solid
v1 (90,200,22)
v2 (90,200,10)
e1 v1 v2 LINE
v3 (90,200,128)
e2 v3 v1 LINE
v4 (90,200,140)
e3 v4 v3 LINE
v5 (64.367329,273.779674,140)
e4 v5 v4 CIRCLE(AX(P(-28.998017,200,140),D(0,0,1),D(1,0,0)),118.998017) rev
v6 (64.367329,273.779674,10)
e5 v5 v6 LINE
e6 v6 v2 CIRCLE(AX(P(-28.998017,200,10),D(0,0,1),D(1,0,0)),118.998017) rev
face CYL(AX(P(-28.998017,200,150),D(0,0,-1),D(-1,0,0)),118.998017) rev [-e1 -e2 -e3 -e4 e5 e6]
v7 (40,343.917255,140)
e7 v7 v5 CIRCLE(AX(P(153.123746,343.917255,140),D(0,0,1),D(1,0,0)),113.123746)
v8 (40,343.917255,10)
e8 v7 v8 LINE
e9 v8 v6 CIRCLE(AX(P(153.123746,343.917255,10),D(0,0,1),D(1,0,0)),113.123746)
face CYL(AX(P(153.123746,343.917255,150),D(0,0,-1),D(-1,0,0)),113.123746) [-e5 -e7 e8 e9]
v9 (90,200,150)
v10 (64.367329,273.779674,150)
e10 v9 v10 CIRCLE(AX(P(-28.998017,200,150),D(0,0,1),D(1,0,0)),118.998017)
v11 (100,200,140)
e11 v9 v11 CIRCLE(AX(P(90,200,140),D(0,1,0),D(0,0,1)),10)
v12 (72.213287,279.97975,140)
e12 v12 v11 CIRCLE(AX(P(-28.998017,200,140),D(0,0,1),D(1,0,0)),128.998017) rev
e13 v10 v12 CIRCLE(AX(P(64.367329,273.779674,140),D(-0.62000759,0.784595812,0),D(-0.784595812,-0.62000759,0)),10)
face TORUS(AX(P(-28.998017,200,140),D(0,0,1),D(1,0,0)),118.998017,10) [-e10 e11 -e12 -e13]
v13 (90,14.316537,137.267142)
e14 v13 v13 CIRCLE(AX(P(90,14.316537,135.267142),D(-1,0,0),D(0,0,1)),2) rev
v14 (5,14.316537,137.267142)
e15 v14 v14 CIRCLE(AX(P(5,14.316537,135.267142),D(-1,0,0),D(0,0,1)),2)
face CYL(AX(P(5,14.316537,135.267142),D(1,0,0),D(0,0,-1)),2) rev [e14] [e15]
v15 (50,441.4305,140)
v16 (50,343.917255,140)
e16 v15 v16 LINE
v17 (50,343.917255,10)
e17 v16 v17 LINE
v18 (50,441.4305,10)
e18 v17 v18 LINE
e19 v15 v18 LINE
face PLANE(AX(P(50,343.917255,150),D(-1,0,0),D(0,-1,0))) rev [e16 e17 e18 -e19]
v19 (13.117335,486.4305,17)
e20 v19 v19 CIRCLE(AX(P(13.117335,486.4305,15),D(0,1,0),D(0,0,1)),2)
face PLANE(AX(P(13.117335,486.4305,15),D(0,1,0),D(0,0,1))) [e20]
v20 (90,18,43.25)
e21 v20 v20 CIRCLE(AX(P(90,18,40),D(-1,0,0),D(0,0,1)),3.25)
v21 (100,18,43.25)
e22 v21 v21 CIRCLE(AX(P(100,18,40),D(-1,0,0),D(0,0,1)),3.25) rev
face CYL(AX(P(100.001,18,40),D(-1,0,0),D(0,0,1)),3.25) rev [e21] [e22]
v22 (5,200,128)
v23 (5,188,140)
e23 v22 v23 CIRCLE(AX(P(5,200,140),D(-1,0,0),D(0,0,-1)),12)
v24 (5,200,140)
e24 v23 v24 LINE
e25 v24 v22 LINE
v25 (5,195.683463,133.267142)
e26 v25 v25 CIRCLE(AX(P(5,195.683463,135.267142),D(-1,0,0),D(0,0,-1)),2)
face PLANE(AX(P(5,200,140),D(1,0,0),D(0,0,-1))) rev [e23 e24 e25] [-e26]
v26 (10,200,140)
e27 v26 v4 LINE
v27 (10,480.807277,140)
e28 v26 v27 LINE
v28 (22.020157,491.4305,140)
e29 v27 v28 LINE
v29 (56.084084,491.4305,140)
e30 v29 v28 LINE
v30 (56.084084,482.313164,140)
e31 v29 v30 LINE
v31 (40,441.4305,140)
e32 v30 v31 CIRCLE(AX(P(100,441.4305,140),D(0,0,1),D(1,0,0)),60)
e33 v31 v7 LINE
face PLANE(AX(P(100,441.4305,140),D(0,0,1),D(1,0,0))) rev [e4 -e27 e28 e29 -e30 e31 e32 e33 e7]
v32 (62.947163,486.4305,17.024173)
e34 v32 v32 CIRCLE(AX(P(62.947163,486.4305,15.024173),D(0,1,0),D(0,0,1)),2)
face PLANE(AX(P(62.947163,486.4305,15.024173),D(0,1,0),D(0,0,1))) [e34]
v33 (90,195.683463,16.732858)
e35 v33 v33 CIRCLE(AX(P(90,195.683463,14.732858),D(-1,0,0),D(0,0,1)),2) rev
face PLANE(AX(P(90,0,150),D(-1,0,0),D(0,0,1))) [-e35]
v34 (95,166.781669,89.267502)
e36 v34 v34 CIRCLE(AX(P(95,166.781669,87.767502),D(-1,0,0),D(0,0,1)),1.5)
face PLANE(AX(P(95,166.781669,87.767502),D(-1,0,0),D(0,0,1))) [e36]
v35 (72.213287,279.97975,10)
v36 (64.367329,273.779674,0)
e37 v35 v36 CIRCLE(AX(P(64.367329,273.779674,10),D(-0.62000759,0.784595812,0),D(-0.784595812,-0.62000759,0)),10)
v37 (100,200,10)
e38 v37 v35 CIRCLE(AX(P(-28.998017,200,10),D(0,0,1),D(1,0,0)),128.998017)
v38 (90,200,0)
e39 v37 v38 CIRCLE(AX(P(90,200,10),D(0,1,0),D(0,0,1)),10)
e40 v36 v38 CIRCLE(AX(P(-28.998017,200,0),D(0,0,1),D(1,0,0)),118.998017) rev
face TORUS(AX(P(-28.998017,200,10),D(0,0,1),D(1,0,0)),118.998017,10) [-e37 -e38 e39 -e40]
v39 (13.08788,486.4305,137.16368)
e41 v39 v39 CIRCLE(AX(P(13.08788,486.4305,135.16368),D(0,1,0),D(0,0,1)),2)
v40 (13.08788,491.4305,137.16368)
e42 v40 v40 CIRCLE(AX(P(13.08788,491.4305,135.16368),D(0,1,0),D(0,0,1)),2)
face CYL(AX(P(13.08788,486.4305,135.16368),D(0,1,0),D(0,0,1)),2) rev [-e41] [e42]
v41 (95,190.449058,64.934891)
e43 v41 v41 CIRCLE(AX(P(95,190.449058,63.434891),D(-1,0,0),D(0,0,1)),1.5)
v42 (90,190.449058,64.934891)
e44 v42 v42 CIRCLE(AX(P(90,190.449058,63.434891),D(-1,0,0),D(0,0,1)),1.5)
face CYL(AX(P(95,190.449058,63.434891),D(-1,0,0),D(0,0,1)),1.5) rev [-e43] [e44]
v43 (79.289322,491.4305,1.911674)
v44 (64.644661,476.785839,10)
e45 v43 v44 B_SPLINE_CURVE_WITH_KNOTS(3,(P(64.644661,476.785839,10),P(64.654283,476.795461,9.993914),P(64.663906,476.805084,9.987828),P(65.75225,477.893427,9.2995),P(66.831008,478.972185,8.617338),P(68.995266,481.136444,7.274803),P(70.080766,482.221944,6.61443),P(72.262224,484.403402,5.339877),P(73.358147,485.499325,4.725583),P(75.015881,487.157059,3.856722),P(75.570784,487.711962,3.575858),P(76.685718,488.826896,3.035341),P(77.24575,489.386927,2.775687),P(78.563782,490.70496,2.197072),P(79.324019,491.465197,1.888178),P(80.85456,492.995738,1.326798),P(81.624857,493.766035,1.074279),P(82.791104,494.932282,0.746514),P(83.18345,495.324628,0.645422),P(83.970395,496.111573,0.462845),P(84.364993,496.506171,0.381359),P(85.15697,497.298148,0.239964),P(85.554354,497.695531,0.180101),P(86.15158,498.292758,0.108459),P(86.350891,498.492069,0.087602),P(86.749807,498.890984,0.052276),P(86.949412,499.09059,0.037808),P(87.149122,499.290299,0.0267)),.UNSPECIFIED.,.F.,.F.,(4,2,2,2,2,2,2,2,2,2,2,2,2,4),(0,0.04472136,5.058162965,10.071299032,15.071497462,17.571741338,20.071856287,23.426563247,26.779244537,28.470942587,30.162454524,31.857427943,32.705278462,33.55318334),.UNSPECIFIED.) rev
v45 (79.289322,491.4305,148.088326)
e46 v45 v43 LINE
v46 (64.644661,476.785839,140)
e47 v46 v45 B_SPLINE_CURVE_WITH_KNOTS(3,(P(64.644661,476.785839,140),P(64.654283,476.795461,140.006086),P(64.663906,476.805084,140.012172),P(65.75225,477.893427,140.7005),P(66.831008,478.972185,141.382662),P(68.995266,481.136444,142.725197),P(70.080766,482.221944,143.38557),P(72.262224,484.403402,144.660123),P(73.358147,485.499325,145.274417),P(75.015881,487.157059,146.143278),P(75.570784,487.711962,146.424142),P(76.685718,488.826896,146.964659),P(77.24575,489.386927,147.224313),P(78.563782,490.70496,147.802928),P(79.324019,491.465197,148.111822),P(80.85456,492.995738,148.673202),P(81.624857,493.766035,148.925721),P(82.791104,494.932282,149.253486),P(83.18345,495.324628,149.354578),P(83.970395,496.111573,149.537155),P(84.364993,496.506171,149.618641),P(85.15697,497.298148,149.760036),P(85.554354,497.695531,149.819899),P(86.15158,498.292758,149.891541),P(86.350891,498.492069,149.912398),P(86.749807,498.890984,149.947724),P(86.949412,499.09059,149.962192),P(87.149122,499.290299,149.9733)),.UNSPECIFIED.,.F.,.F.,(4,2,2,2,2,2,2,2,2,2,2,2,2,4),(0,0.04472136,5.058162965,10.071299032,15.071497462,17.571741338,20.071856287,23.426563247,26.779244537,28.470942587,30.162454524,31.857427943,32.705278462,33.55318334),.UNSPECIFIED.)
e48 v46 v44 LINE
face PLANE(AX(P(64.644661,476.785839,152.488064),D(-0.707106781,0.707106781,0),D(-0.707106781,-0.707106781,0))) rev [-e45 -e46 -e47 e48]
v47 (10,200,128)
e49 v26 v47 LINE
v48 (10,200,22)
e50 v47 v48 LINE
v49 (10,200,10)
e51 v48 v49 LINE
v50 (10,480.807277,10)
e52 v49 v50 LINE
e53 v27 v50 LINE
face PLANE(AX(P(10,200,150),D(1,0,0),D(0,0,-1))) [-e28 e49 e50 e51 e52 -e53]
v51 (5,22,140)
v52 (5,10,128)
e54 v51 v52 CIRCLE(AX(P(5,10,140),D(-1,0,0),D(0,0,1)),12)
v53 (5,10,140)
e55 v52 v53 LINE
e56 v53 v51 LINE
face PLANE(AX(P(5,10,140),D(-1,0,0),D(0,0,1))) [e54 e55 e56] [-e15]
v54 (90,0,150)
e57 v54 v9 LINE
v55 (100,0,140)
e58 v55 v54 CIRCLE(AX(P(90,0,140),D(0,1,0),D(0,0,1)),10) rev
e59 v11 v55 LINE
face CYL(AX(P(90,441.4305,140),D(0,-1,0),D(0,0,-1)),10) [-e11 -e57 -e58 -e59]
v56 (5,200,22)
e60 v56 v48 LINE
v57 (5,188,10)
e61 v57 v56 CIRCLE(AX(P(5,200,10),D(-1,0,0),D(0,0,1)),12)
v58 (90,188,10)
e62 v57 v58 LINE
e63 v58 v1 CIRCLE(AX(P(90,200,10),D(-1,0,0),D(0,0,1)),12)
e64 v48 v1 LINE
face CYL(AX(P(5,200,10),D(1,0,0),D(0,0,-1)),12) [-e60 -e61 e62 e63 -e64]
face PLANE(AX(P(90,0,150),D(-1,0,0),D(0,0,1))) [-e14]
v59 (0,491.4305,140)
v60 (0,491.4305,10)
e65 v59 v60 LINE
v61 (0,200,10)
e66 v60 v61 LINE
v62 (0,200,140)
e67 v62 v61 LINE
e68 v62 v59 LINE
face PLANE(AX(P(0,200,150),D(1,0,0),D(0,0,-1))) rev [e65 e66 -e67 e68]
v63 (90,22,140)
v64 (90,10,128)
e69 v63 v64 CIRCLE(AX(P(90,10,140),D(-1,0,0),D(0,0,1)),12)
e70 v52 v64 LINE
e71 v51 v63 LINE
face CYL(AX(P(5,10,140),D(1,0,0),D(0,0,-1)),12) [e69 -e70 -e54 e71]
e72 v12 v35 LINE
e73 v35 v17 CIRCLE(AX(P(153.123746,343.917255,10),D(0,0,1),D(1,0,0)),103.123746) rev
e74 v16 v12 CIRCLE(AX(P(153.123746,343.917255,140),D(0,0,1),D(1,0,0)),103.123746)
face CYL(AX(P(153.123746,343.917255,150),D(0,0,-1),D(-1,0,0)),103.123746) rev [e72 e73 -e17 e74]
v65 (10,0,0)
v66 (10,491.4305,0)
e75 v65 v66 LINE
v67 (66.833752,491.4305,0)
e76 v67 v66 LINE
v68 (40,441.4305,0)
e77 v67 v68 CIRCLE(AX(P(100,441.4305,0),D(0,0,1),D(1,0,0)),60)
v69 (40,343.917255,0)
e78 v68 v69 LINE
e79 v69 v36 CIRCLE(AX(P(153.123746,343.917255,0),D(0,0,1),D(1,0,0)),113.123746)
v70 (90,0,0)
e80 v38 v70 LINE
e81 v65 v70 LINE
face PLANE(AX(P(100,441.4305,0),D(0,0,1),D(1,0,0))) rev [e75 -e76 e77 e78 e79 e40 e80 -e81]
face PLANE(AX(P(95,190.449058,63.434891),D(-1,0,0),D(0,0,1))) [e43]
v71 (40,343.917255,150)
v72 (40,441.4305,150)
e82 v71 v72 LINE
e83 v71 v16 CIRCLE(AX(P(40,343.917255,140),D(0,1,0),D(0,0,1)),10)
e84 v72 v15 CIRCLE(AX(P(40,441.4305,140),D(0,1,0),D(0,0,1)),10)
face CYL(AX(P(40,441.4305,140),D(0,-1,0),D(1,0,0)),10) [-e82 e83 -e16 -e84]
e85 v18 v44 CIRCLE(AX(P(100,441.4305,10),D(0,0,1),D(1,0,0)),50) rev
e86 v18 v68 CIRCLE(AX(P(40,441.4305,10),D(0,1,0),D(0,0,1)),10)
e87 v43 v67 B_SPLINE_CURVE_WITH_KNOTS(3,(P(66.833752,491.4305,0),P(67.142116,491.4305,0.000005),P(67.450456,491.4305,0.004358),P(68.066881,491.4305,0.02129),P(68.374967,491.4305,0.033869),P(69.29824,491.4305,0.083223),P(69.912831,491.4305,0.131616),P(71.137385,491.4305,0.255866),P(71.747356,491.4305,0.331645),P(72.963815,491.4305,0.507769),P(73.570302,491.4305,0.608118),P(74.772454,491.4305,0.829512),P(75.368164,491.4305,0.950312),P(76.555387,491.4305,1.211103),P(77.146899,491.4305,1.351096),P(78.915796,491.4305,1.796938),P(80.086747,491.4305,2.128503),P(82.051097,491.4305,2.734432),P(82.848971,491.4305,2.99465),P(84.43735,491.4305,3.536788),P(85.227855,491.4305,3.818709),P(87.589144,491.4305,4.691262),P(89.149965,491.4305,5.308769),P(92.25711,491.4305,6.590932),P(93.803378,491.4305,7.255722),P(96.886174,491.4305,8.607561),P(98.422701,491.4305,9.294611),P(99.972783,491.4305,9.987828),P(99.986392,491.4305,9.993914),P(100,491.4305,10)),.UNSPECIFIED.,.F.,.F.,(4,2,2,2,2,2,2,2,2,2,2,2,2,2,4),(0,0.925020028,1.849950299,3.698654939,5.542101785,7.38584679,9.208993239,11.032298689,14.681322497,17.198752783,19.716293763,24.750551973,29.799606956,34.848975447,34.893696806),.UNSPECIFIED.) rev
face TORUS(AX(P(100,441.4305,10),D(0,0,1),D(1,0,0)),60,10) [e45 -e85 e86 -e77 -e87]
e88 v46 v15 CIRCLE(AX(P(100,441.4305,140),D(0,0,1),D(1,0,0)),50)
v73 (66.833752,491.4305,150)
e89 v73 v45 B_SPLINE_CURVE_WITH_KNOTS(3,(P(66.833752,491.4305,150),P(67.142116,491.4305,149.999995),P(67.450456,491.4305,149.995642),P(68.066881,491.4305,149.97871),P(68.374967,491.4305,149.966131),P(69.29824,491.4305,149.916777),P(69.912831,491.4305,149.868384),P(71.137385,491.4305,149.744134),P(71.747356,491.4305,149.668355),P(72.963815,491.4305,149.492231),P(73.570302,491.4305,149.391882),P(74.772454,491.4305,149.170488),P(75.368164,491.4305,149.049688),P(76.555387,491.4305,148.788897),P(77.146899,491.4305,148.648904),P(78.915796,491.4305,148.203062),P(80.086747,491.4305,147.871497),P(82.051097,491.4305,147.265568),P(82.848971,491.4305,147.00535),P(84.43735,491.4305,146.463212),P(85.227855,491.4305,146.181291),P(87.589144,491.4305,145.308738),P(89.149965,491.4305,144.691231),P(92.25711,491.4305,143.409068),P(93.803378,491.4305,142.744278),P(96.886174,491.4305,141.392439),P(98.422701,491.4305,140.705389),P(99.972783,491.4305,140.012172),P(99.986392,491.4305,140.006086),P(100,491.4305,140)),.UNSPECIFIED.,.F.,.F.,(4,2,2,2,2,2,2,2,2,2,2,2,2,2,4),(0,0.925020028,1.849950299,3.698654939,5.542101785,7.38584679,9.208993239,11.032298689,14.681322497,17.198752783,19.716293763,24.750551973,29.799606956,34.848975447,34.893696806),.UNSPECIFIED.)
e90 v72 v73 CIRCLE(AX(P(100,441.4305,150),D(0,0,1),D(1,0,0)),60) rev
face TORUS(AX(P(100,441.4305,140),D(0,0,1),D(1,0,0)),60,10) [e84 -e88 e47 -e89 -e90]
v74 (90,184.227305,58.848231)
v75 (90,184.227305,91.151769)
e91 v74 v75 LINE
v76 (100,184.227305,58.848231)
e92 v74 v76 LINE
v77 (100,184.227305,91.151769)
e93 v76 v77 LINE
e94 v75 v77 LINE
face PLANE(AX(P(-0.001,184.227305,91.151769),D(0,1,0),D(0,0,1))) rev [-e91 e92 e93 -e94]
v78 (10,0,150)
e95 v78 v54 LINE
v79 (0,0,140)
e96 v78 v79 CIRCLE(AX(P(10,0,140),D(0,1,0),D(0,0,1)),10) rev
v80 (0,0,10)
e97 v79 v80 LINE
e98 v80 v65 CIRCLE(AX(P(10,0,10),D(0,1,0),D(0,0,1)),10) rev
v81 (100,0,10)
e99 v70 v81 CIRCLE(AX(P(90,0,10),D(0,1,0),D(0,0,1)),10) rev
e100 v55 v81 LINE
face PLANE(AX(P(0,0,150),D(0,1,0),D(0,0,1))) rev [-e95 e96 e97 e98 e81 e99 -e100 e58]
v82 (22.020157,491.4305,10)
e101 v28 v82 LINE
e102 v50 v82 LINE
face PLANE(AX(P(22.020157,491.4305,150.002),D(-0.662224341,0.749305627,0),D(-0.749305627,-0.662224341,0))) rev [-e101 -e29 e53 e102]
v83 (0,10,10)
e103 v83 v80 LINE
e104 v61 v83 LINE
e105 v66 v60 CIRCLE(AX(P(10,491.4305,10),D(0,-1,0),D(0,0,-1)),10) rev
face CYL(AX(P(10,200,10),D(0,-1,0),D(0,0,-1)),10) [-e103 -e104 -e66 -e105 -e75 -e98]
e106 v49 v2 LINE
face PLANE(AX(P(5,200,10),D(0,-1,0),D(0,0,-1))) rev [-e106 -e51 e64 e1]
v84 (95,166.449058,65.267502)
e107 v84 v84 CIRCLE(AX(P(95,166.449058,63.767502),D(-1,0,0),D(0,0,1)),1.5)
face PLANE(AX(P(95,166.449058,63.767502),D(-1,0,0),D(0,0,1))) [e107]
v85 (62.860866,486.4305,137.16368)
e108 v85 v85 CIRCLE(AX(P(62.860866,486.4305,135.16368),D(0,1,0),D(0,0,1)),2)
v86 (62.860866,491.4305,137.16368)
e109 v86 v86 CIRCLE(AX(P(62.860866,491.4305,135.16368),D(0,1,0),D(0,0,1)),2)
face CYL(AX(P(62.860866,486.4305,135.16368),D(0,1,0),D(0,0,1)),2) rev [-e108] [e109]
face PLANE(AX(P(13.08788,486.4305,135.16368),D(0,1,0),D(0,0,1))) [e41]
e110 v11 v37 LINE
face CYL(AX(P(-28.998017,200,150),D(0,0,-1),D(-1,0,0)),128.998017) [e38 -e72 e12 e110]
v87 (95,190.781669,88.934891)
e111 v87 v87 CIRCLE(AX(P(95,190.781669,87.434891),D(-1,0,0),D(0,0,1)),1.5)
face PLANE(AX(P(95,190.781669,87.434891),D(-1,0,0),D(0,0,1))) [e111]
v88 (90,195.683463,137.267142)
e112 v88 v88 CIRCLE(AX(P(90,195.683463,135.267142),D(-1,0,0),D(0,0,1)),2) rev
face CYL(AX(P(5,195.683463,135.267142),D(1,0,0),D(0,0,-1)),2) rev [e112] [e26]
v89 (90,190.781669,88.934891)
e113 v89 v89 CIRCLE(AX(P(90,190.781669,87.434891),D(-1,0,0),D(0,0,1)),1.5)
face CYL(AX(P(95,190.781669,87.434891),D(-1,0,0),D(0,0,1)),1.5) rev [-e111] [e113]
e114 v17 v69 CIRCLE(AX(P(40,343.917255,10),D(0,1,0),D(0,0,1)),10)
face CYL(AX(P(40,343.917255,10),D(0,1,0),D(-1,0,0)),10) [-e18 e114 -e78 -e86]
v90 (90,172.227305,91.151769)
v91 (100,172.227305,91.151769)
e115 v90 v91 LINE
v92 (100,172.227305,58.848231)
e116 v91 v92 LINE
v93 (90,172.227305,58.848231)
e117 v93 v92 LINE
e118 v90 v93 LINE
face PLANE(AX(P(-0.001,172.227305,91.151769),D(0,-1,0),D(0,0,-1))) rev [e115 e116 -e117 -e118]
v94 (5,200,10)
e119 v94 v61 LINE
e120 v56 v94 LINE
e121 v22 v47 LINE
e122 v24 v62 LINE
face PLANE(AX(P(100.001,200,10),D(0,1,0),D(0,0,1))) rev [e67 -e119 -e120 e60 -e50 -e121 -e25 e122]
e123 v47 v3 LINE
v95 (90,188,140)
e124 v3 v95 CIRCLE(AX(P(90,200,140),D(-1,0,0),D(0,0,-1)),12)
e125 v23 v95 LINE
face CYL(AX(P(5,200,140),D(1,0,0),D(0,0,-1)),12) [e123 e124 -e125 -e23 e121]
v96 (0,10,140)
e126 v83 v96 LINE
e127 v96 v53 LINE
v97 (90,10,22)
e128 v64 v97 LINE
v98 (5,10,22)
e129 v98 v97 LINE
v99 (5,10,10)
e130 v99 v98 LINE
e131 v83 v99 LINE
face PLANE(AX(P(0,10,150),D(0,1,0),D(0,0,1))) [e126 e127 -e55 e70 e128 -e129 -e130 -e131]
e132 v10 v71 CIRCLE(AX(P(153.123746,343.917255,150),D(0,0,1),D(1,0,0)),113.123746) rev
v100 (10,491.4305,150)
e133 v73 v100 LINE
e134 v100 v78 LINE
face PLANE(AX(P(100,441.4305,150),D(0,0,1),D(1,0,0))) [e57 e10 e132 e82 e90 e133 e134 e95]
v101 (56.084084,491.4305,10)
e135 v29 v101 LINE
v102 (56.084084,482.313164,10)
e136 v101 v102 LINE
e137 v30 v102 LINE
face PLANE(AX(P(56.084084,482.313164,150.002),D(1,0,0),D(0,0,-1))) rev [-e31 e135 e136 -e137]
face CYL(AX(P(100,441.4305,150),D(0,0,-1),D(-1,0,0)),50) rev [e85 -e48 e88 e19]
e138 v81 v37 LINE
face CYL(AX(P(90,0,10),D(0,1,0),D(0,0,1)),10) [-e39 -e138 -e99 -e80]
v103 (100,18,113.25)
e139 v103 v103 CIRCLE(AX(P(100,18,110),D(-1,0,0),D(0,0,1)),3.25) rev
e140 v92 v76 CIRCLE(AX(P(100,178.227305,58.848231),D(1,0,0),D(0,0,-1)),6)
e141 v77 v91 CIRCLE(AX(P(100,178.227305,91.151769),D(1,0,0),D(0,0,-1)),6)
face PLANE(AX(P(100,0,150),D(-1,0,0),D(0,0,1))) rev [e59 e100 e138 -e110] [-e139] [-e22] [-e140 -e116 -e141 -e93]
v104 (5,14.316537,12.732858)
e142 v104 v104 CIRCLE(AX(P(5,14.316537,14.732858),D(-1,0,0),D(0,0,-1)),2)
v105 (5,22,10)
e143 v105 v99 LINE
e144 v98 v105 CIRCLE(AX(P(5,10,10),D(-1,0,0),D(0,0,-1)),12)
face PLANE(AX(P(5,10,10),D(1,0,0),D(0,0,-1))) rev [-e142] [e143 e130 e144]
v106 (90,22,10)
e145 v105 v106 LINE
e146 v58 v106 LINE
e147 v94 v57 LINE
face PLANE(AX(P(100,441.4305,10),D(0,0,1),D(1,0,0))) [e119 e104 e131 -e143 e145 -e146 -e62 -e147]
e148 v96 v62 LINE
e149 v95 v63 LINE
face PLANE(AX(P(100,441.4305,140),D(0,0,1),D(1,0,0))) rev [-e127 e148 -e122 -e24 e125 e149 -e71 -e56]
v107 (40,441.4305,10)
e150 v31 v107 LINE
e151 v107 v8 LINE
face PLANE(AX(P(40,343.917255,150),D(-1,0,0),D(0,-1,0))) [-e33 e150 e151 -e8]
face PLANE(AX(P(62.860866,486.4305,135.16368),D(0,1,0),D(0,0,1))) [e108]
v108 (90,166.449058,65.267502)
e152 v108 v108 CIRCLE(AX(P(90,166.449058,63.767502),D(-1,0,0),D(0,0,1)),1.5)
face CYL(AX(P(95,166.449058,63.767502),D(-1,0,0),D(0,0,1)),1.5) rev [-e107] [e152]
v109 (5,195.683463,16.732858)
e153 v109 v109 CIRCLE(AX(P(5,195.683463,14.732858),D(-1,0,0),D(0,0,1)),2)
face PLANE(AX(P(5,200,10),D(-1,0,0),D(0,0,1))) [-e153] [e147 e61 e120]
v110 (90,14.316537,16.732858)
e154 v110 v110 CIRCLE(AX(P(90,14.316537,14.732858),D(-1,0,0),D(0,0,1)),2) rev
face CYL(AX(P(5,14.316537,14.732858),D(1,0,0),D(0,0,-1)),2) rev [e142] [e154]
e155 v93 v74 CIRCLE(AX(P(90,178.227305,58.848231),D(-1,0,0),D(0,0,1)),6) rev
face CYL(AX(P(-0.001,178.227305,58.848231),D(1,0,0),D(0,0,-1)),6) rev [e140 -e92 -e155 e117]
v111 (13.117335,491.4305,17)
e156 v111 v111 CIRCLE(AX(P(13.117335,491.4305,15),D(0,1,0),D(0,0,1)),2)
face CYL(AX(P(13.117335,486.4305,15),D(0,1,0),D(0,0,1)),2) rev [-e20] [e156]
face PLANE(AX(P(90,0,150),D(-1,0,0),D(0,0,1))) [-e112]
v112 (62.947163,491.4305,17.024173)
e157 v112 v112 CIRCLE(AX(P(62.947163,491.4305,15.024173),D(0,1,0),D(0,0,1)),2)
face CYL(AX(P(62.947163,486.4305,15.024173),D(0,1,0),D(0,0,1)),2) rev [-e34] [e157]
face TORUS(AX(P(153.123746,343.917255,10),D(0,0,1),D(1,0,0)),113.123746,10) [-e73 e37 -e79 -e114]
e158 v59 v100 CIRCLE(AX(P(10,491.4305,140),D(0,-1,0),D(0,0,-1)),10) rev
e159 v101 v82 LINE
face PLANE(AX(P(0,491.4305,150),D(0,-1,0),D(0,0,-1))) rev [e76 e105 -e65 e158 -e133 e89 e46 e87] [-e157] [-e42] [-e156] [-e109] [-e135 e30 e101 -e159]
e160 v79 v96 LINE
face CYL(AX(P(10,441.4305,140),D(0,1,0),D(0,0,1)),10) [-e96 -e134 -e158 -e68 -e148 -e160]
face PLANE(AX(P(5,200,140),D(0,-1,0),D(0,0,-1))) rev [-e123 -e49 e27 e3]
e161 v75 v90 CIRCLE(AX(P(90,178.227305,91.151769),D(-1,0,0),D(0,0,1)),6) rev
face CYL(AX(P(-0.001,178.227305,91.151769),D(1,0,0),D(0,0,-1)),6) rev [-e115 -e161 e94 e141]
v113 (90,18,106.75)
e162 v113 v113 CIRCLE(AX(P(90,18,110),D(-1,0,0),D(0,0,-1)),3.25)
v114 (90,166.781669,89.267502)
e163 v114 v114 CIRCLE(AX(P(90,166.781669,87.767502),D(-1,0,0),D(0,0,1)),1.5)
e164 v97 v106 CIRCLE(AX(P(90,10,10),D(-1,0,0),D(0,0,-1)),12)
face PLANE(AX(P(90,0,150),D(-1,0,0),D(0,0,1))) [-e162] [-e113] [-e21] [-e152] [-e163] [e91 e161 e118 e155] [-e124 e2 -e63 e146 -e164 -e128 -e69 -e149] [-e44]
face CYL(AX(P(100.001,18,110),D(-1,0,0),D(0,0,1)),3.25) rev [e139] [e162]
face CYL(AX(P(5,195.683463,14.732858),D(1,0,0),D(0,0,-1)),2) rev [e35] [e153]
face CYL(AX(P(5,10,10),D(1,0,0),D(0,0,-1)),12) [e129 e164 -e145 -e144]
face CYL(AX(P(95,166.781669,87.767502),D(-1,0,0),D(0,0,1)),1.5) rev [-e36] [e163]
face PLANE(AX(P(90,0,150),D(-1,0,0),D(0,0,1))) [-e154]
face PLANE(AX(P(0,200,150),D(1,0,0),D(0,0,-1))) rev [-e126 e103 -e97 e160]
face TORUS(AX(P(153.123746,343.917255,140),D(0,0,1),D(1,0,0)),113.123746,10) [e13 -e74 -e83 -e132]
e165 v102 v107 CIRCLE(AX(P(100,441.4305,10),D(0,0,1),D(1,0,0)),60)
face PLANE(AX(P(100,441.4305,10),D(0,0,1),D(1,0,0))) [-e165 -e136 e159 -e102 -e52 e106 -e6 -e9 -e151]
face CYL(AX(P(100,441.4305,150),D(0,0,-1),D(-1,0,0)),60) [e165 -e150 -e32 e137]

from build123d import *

# Parameters (mm, degrees)
BOSS_EXTRUDE1_DEPTH = 150
FILLET1_R           = 10
SHELL1_START        = 10
SHELL1_DEPTH        = 130
CUT_EXTRUDE1_REACH  = 525.454
CUT_EXTRUDE2_REACH  = 525.454
SKETCH3_W           = 130
SKETCH3_H           = 190
CUT_EXTRUDE3_REACH  = 523.636
SKETCH5_R           = 3.25
SKETCH6_R           = 2
BOSS_EXTRUDE2_DEPTH = 85
CUT_EXTRUDE4_REACH  = 525.454
BOSS_EXTRUDE3_REACH = 522.676
SKETCH9_W           = 10.749668542
SKETCH9_H           = 9.117335181
SKETCH10_R          = 2
CUT_EXTRUDE6_DEPTH  = 5
SKETCH11_R          = 1.5
CUT_EXTRUDE7_DEPTH  = 5


# Read off the part's stored shape, not the designer's step: Shell1
with BuildPart() as part:
    # Sketch1 → Boss-Extrude1 (new body)
    with BuildSketch(Plane.XY):
        with BuildLine():
            Line((0, 200), (0, 491.430499628))
            Line((0, 491.430499628), (100, 491.430499628))
            ThreePointArc((100, 491.430499628), (64.644660941, 476.785838687), (50, 441.430499628))
            Line((50, 441.430499628), (50, 343.917255306))
            ThreePointArc((50, 343.917255306), (55.711486428, 310.074107136), (72.213286827, 279.979749876))
            ThreePointArc((72.213286827, 279.979749876), (92.855472654, 242.334565721), (100, 200))
            Line((100, 200), (100, 0))
            Line((100, 0), (0, 0))
            Line((0, 0), (0, 200))
        make_face()
    extrude(amount=BOSS_EXTRUDE1_DEPTH)

    # Fillet1
    fillet1_edges = [part.edges().sort_by_distance(p)[0] for p in [
        (64.644660941, 476.785838687, 0),
        (50, 392.673877467, 0),
        (55.711486428, 310.074107136, 0),
        (92.855472654, 242.334565721, 0),
        (100, 100, 0),
        (100, 100, 150),
        (92.855472654, 242.334565721, 150),
        (55.711486428, 310.074107136, 150),
        (50, 392.673877467, 150),
        (64.644660941, 476.785838687, 150),
        (0, 245.715249814, 150),
        (0, 245.715249814, 0),
    ]]
    fillet(fillet1_edges, radius=FILLET1_R)

    # Shell1 outline → Shell1 (cut)
    with BuildSketch(Plane.XY.offset(SHELL1_START)):
        with BuildLine():
            Line((10, 10), (90, 10))
            Line((90, 10), (90, 200))
            ThreePointArc((90, 200), (83.409320496, 239.052766003), (64.367328706, 273.779673977))
            ThreePointArc((64.367328706, 273.779673977), (46.265334269, 306.792307417), (40, 343.917255306))
            Line((40, 343.917255306), (40, 441.430499628))
            ThreePointArc((40, 441.430499628), (47.132359263, 469.803242937), (66.833752096, 491.430499628))
            Line((66.833752096, 491.430499628), (10, 491.430499628))
            Line((10, 491.430499628), (10, 10))
        make_face()
    extrude(amount=SHELL1_DEPTH, mode=Mode.SUBTRACT)

    # Sketch2 → Cut-Extrude1 (cut, up to next)
    with BuildSketch(Plane(origin=(100, 0, 0), x_dir=(0, 0, -1), z_dir=(1, 0, 0)), mode=Mode.PRIVATE) as cut_extrude1_sk1:
        with BuildLine():
            Line((-91.151768807, 184.227304536), (-58.848231193, 184.227304536))
            ThreePointArc((-58.848231193, 184.227304536), (-52.848231193, 178.227304536), (-58.848231193, 172.227304536))
            Line((-58.848231193, 172.227304536), (-91.151768807, 172.227304536))
            ThreePointArc((-91.151768807, 172.227304536), (-97.151768807, 178.227304536), (-91.151768807, 184.227304536))
        make_face()
    cut_extrude1_tool1 = extrude(cut_extrude1_sk1.sketch, amount=-CUT_EXTRUDE1_REACH, mode=Mode.PRIVATE) & part.part
    add(cut_extrude1_tool1.solids().sort_by_distance((100, 178.227305, 75))[0], mode=Mode.SUBTRACT)

    # Sketch3 → Cut-Extrude2 (cut, up to next)
    with BuildSketch(Plane.ZY, mode=Mode.PRIVATE) as cut_extrude2_sk1:
        with Locations((75, 105)):
            Rectangle(SKETCH3_W, SKETCH3_H)
    cut_extrude2_tool1 = extrude(cut_extrude2_sk1.sketch, amount=-CUT_EXTRUDE2_REACH, mode=Mode.PRIVATE) & part.part
    add(cut_extrude2_tool1.solids().sort_by_distance((0, 105, 75))[0], mode=Mode.SUBTRACT)

    # Sketch5 → Cut-Extrude3 (cut, up to next)
    with BuildSketch(Plane.ZY.offset(-90), mode=Mode.PRIVATE) as cut_extrude3_sk1:
        with Locations((40, 18)):
            Circle(SKETCH5_R)
    cut_extrude3_tool1 = extrude(cut_extrude3_sk1.sketch, amount=-CUT_EXTRUDE3_REACH, mode=Mode.PRIVATE) & part.part
    # Sketch5 → Cut-Extrude3 (cut, up to next)
    with BuildSketch(Plane.ZY.offset(-90), mode=Mode.PRIVATE) as cut_extrude3_sk2:
        with Locations((110, 18)):
            Circle(SKETCH5_R)
    cut_extrude3_tool2 = extrude(cut_extrude3_sk2.sketch, amount=-CUT_EXTRUDE3_REACH, mode=Mode.PRIVATE) & part.part
    add(cut_extrude3_tool1.solids().sort_by_distance((90, 18, 40))[0], mode=Mode.SUBTRACT)
    add(cut_extrude3_tool2.solids().sort_by_distance((90, 18, 110))[0], mode=Mode.SUBTRACT)

    # Sketch6 → Boss-Extrude2 (add)
    # profile 1 of 4: a face of its own
    with BuildSketch(Plane.ZY.offset(-90)):
        with BuildLine():
            Line((10, 200), (10, 188))
            ThreePointArc((10, 188), (18.485281374, 191.514718626), (22, 200))
            Line((22, 200), (10, 200))
        make_face()
        with Locations((14.732857766, 195.683462966)):
            Circle(SKETCH6_R, mode=Mode.SUBTRACT)
    # profile 2 of 4: a face of its own
    with BuildSketch(Plane.ZY.offset(-90)):
        with BuildLine():
            Line((140, 200), (140, 188))
            ThreePointArc((140, 188), (131.514718626, 191.514718626), (128, 200))
            Line((128, 200), (140, 200))
        make_face()
        with Locations(Location((135.267142234, 195.683462966, 0), (0, 0, 180))):
            Circle(SKETCH6_R, mode=Mode.SUBTRACT)
    # profile 3 of 4: a face of its own
    with BuildSketch(Plane.ZY.offset(-90)):
        with BuildLine():
            Line((140, 10), (128, 10))
            ThreePointArc((128, 10), (131.514718626, 18.485281374), (140, 22))
            Line((140, 22), (140, 10))
        make_face()
        with Locations((135.267142234, 14.316537034)):
            Circle(SKETCH6_R, mode=Mode.SUBTRACT)
    # profile 4 of 4: a face of its own
    with BuildSketch(Plane.ZY.offset(-90)):
        with BuildLine():
            Line((10, 10), (22, 10))
            ThreePointArc((22, 10), (18.485281374, 18.485281374), (10, 22))
            Line((10, 22), (10, 10))
        make_face()
        with Locations(Location((14.732857766, 14.316537034, 0), (0, 0, 180))):
            Circle(SKETCH6_R, mode=Mode.SUBTRACT)
    extrude(amount=BOSS_EXTRUDE2_DEPTH)

    # Sketch8 → Cut-Extrude4 (cut, up to next)
    with BuildSketch(Plane(origin=(0, 0, 0), x_dir=(-1, 0, 0), z_dir=(0, 0, -1)), mode=Mode.PRIVATE) as cut_extrude4_sk1:
        Polygon((-64.644660941, 476.785838687), (-79.289321881, 491.430499628), (-115.095354781, 491.430499628), align=None)
    cut_extrude4_tool1 = extrude(cut_extrude4_sk1.sketch, amount=-CUT_EXTRUDE4_REACH, mode=Mode.PRIVATE) & part.part
    add(cut_extrude4_tool1.solids().sort_by_distance((86.343113, 486.548946, 0))[0], mode=Mode.SUBTRACT)

    # Sketch9 → Boss-Extrude3 (add, up to next)
    with BuildSketch(Plane.XY.offset(10), mode=Mode.PRIVATE) as boss_extrude3_sk1:
        Polygon((22.020157431, 491.430499628), (10, 480.807276536), (10, 491.430499628), align=None)
    boss_extrude3_tool1 = extrude(boss_extrude3_sk1.sketch, amount=BOSS_EXTRUDE3_REACH, mode=Mode.PRIVATE) - part.part
    # Sketch9 → Boss-Extrude3 (add, up to next)
    with BuildSketch(Plane.XY.offset(10), mode=Mode.PRIVATE) as boss_extrude3_sk2:
        with Locations((61.458917825, 486.871832037)):
            Rectangle(SKETCH9_W, SKETCH9_H)
    boss_extrude3_tool2 = extrude(boss_extrude3_sk2.sketch, amount=BOSS_EXTRUDE3_REACH, mode=Mode.PRIVATE) - part.part
    add(boss_extrude3_tool1.solids().sort_by_distance((14.006719, 487.889425, 10))[0])
    add(boss_extrude3_tool2.solids().sort_by_distance((61.458918, 486.871832, 10))[0])

    # Sketch10 → Cut-Extrude6 (cut)
    with BuildSketch(Plane(origin=(0, 491.430499628, 0), x_dir=(1, 0, 0), z_dir=(0, 1, 0))):
        with Locations(Location((13.117335181, -15, 0), (0, 0, 270))):
            Circle(SKETCH10_R)
        with Locations(Location((62.947163257, -15.024173332, 0), (0, 0, 270))):
            Circle(SKETCH10_R)
        with Locations(Location((62.860866202, -135.163680398, 0), (0, 0, 270))):
            Circle(SKETCH10_R)
        with Locations(Location((13.087879919, -135.163680398, 0), (0, 0, 270))):
            Circle(SKETCH10_R)
    extrude(amount=-CUT_EXTRUDE6_DEPTH, mode=Mode.SUBTRACT)

    # Sketch11 → Cut-Extrude7 (cut)
    with BuildSketch(Plane.ZY.offset(-90)):
        with Locations((87.434890577, 190.781669354)):
            Circle(SKETCH11_R)
        with Locations((63.434890577, 190.449058246)):
            Circle(SKETCH11_R)
        with Locations((63.767501685, 166.449058246)):
            Circle(SKETCH11_R)
        with Locations((87.767501685, 166.781669354)):
            Circle(SKETCH11_R)
    extrude(amount=-CUT_EXTRUDE7_DEPTH, mode=Mode.SUBTRACT)


solid = part.part
